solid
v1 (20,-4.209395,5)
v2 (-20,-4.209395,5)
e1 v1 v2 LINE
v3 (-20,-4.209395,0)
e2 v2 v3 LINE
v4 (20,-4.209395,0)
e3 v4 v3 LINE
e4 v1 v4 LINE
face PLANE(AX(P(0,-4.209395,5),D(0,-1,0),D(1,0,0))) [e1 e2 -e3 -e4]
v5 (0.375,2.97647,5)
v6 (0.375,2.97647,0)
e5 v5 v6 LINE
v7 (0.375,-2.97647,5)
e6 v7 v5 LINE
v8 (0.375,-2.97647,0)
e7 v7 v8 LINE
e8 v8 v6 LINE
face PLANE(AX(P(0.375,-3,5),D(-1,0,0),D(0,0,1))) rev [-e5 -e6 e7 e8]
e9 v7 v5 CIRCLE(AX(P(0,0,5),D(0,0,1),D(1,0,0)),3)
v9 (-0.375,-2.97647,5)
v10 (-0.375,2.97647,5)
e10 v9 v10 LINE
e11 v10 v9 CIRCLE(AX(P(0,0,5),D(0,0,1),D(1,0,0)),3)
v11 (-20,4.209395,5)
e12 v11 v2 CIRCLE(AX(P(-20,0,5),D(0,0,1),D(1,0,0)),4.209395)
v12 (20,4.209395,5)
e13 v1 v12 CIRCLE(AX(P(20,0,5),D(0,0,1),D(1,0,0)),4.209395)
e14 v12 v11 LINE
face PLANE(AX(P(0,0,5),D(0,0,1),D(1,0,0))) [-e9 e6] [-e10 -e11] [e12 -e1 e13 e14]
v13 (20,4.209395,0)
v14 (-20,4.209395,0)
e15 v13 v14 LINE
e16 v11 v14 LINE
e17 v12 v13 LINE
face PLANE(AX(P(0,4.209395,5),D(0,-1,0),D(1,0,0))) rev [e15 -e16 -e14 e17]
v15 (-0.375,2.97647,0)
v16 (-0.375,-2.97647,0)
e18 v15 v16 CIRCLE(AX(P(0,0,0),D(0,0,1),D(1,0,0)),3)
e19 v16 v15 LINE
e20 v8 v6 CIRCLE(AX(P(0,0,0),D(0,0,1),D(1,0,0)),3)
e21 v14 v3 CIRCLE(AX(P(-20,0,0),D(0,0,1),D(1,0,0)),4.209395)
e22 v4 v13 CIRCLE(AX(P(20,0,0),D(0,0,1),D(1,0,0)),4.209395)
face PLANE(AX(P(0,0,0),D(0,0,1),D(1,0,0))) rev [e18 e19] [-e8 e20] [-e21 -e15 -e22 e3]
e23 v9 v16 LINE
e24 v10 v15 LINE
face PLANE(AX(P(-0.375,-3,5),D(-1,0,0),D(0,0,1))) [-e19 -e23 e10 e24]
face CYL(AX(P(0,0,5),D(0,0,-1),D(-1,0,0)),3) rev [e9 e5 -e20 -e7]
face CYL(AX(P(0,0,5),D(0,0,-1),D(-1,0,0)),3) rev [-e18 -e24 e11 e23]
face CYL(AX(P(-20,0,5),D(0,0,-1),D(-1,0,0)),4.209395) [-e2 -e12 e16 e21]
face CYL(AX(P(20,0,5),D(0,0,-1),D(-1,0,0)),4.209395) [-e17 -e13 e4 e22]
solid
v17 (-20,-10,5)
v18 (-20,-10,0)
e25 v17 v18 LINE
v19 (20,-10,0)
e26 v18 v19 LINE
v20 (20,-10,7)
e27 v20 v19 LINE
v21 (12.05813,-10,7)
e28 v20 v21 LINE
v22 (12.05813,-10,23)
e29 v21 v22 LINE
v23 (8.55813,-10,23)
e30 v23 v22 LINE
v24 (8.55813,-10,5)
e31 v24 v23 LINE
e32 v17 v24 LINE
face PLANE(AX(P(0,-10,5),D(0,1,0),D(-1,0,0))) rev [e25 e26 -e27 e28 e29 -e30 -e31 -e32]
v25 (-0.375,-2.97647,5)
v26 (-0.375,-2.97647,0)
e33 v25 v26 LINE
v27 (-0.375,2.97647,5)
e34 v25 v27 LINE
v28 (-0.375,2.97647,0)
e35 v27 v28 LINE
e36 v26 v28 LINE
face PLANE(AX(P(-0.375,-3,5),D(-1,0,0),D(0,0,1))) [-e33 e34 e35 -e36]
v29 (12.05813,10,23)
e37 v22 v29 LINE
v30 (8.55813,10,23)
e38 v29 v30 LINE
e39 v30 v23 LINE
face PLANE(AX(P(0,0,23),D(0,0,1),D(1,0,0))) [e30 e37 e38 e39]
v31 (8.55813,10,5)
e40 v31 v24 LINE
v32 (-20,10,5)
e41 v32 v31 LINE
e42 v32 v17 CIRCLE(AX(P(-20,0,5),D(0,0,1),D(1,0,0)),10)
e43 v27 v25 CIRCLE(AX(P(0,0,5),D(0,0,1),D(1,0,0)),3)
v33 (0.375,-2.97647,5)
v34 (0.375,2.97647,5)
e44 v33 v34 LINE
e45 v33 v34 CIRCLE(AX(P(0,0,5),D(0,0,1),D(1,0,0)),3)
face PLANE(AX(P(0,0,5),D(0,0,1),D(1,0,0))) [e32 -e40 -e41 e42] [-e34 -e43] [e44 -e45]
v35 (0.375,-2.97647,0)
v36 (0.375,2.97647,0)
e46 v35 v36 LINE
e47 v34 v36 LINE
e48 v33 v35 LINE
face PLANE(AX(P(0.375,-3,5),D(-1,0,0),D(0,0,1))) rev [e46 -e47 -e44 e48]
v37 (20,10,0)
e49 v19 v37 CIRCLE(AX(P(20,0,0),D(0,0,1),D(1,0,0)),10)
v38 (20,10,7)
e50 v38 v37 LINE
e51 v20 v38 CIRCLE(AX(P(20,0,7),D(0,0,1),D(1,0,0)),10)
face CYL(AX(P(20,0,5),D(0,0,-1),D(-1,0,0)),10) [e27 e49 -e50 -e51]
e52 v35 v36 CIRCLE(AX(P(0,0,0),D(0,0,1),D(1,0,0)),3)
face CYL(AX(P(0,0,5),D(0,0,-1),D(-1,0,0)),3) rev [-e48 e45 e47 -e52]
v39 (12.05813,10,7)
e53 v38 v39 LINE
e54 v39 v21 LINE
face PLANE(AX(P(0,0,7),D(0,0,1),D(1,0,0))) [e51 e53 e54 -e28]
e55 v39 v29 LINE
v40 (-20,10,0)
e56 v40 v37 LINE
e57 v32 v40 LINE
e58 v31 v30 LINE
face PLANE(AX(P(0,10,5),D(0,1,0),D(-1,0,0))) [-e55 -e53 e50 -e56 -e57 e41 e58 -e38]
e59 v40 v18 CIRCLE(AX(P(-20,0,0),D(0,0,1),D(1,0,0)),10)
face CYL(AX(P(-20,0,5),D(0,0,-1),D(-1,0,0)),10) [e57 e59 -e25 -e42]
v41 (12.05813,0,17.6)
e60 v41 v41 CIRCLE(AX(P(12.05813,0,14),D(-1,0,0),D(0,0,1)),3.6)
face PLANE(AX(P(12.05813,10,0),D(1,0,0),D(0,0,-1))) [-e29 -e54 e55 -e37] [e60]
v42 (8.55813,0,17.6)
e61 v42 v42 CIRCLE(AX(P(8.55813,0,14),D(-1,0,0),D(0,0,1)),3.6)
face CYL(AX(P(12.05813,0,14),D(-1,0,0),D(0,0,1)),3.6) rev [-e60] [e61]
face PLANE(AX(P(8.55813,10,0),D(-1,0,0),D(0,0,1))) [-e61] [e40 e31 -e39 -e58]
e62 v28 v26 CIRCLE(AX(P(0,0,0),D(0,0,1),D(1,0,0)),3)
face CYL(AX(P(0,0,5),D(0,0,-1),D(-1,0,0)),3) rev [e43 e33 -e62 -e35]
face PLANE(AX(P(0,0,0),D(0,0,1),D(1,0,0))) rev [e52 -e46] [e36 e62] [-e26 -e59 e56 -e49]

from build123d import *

# Parameters (mm, degrees)
EXTRUDE_1_DEPTH       = 5
SKETCH_1_3_W          = 0.75
SKETCH_1_3_H          = 6
EXTRUDE_2_DEPTH       = 5
EXTRUDE_10_DEPTH      = 5
EXTRUDE_16_DEPTH      = 5
EXTRUDE_18_DEPTH      = 18
EXTRUDE_18_DEPTH_BACK = 5
SKETCH_2_W            = 3.5
SKETCH_2_H            = 20
SKETCH_3_R            = 3.6
CUT_EXTRUDE_2_DEPTH   = 3.5
SKETCH_4_R            = 10
SKETCH_4_W            = 7.941870484
SKETCH_4_H            = 20
EXTRUDE_21_DEPTH      = 2
SKETCH_1_20_W         = 0.75
SKETCH_1_20_H         = 6
EXTRUDE_23_DEPTH      = 5


# Read off the part's stored shape, not the designer's step: 凸台-拉伸10
with BuildPart() as part:
    # 草图1 → 凸台-拉伸1 (new body)
    with BuildSketch(Plane.XY):
        with BuildLine():
            Line((-20, -4.209395136), (20, -4.209395136))
            ThreePointArc((20, -4.209395136), (24.209395136, 0), (20, 4.209395136))
            Line((20, 4.209395136), (-20, 4.209395136))
            ThreePointArc((-20, 4.209395136), (-24.209395136, 0), (-20, -4.209395136))
        make_face()
        with BuildLine():
            Line((6e-09, -3), (-0.375, -3))
            Line((-0.375, -3), (-0.375, -2.976470225))
            ThreePointArc((-0.375, -2.976470225), (-3, 0), (-0.375, 2.976470225))
            Line((-0.375, 2.976470225), (-0.375, 3))
            Line((-0.375, 3), (0, 3))
            Line((0, 3), (0.375, 3))
            Line((0.375, 3), (0.375, 2.976470225))
            ThreePointArc((0.375, 2.976470225), (2.25, 1.984313483), (3, 0))
            ThreePointArc((3, 0), (2.25, -1.984313483), (0.375, -2.976470225))
            Line((0.375, -2.976470225), (0.375, -3))
            Line((0.375, -3), (6e-09, -3))
        make_face(mode=Mode.SUBTRACT)
    extrude(amount=EXTRUDE_1_DEPTH)

    # 草图1<3> → 凸台-拉伸2 (add)
    with BuildSketch(Plane.XY):
        Rectangle(SKETCH_1_3_W, SKETCH_1_3_H)
    extrude(amount=EXTRUDE_2_DEPTH)


with BuildPart() as body_2:
    # 凸台-拉伸10 outline → 凸台-拉伸10 (new body)
    with BuildSketch(Plane.XY):
        with BuildLine():
            Line((20, 4.209395136), (-20, 4.209395136))
            ThreePointArc((-20, 4.209395136), (-24.209395136, 0), (-20, -4.209395136))
            Line((-20, -4.209395136), (20, -4.209395136))
            ThreePointArc((20, -4.209395136), (24.209395136, 0), (20, 4.209395136))
        make_face()
        with BuildLine():
            Line((-0.375, -3), (-0.375, -2.976470225))
            ThreePointArc((-0.375, -2.976470225), (-3, 0), (-0.375, 2.976470225))
            Line((-0.375, 2.976470225), (-0.375, 3))
            Line((-0.375, 3), (0.375, 3))
            Line((0.375, 3), (0.375, 2.976470225))
            ThreePointArc((0.375, 2.976470225), (3, 0), (0.375, -2.976470225))
            Line((0.375, -2.976470225), (0.375, -3))
            Line((0.375, -3), (-0.375, -3))
        make_face(mode=Mode.SUBTRACT)
    extrude(amount=EXTRUDE_10_DEPTH)

    # 草图1<15> → 凸台-拉伸16 (add)
    with BuildSketch(Plane.XY):
        with BuildLine():
            Line((-20, -10), (20, -10))
            ThreePointArc((20, -10), (30, 0), (20, 10))
            Line((20, 10), (-20, 10))
            ThreePointArc((-20, 10), (-30, 0), (-20, -10))
        make_face()
        with BuildLine():
            ThreePointArc((-20, 4.209395136), (-24.209395136, 0), (-20, -4.209395136))
            Line((-20, -4.209395136), (20, -4.209395136))
            ThreePointArc((20, -4.209395136), (24.209395136, 0), (20, 4.209395136))
            Line((20, 4.209395136), (-20, 4.209395136))
        make_face(mode=Mode.SUBTRACT)
    extrude(amount=EXTRUDE_16_DEPTH)

    # 草图2 → 凸台-拉伸18 (add, two sides: drawn at the far end of the back side and taken through both)
    with BuildSketch(Plane.XY.offset(5).offset(-EXTRUDE_18_DEPTH_BACK)):
        with Locations((10.308129516, 0)):
            Rectangle(SKETCH_2_W, SKETCH_2_H)
    extrude(amount=EXTRUDE_18_DEPTH + EXTRUDE_18_DEPTH_BACK)

    # 草图3 → 切除-拉伸2 (cut)
    with BuildSketch(Plane.ZY.offset(-8.558129516)):
        with Locations((14, 0)):
            Circle(SKETCH_3_R)
    extrude(amount=-CUT_EXTRUDE_2_DEPTH, mode=Mode.SUBTRACT)

    # 草图4 → 凸台-拉伸21 (add)
    with BuildSketch(Plane.XY.offset(5)):
        with Locations((20, 0)):
            Circle(SKETCH_4_R)
        with Locations((16.029064758, 0)):
            Rectangle(SKETCH_4_W, SKETCH_4_H)
    extrude(amount=EXTRUDE_21_DEPTH)

    # 草图1<20> → 凸台-拉伸23 (add)
    with BuildSketch(Plane.XY):
        Rectangle(SKETCH_1_20_W, SKETCH_1_20_H)
    extrude(amount=EXTRUDE_23_DEPTH)


solid = Compound([part.part, body_2.part])
